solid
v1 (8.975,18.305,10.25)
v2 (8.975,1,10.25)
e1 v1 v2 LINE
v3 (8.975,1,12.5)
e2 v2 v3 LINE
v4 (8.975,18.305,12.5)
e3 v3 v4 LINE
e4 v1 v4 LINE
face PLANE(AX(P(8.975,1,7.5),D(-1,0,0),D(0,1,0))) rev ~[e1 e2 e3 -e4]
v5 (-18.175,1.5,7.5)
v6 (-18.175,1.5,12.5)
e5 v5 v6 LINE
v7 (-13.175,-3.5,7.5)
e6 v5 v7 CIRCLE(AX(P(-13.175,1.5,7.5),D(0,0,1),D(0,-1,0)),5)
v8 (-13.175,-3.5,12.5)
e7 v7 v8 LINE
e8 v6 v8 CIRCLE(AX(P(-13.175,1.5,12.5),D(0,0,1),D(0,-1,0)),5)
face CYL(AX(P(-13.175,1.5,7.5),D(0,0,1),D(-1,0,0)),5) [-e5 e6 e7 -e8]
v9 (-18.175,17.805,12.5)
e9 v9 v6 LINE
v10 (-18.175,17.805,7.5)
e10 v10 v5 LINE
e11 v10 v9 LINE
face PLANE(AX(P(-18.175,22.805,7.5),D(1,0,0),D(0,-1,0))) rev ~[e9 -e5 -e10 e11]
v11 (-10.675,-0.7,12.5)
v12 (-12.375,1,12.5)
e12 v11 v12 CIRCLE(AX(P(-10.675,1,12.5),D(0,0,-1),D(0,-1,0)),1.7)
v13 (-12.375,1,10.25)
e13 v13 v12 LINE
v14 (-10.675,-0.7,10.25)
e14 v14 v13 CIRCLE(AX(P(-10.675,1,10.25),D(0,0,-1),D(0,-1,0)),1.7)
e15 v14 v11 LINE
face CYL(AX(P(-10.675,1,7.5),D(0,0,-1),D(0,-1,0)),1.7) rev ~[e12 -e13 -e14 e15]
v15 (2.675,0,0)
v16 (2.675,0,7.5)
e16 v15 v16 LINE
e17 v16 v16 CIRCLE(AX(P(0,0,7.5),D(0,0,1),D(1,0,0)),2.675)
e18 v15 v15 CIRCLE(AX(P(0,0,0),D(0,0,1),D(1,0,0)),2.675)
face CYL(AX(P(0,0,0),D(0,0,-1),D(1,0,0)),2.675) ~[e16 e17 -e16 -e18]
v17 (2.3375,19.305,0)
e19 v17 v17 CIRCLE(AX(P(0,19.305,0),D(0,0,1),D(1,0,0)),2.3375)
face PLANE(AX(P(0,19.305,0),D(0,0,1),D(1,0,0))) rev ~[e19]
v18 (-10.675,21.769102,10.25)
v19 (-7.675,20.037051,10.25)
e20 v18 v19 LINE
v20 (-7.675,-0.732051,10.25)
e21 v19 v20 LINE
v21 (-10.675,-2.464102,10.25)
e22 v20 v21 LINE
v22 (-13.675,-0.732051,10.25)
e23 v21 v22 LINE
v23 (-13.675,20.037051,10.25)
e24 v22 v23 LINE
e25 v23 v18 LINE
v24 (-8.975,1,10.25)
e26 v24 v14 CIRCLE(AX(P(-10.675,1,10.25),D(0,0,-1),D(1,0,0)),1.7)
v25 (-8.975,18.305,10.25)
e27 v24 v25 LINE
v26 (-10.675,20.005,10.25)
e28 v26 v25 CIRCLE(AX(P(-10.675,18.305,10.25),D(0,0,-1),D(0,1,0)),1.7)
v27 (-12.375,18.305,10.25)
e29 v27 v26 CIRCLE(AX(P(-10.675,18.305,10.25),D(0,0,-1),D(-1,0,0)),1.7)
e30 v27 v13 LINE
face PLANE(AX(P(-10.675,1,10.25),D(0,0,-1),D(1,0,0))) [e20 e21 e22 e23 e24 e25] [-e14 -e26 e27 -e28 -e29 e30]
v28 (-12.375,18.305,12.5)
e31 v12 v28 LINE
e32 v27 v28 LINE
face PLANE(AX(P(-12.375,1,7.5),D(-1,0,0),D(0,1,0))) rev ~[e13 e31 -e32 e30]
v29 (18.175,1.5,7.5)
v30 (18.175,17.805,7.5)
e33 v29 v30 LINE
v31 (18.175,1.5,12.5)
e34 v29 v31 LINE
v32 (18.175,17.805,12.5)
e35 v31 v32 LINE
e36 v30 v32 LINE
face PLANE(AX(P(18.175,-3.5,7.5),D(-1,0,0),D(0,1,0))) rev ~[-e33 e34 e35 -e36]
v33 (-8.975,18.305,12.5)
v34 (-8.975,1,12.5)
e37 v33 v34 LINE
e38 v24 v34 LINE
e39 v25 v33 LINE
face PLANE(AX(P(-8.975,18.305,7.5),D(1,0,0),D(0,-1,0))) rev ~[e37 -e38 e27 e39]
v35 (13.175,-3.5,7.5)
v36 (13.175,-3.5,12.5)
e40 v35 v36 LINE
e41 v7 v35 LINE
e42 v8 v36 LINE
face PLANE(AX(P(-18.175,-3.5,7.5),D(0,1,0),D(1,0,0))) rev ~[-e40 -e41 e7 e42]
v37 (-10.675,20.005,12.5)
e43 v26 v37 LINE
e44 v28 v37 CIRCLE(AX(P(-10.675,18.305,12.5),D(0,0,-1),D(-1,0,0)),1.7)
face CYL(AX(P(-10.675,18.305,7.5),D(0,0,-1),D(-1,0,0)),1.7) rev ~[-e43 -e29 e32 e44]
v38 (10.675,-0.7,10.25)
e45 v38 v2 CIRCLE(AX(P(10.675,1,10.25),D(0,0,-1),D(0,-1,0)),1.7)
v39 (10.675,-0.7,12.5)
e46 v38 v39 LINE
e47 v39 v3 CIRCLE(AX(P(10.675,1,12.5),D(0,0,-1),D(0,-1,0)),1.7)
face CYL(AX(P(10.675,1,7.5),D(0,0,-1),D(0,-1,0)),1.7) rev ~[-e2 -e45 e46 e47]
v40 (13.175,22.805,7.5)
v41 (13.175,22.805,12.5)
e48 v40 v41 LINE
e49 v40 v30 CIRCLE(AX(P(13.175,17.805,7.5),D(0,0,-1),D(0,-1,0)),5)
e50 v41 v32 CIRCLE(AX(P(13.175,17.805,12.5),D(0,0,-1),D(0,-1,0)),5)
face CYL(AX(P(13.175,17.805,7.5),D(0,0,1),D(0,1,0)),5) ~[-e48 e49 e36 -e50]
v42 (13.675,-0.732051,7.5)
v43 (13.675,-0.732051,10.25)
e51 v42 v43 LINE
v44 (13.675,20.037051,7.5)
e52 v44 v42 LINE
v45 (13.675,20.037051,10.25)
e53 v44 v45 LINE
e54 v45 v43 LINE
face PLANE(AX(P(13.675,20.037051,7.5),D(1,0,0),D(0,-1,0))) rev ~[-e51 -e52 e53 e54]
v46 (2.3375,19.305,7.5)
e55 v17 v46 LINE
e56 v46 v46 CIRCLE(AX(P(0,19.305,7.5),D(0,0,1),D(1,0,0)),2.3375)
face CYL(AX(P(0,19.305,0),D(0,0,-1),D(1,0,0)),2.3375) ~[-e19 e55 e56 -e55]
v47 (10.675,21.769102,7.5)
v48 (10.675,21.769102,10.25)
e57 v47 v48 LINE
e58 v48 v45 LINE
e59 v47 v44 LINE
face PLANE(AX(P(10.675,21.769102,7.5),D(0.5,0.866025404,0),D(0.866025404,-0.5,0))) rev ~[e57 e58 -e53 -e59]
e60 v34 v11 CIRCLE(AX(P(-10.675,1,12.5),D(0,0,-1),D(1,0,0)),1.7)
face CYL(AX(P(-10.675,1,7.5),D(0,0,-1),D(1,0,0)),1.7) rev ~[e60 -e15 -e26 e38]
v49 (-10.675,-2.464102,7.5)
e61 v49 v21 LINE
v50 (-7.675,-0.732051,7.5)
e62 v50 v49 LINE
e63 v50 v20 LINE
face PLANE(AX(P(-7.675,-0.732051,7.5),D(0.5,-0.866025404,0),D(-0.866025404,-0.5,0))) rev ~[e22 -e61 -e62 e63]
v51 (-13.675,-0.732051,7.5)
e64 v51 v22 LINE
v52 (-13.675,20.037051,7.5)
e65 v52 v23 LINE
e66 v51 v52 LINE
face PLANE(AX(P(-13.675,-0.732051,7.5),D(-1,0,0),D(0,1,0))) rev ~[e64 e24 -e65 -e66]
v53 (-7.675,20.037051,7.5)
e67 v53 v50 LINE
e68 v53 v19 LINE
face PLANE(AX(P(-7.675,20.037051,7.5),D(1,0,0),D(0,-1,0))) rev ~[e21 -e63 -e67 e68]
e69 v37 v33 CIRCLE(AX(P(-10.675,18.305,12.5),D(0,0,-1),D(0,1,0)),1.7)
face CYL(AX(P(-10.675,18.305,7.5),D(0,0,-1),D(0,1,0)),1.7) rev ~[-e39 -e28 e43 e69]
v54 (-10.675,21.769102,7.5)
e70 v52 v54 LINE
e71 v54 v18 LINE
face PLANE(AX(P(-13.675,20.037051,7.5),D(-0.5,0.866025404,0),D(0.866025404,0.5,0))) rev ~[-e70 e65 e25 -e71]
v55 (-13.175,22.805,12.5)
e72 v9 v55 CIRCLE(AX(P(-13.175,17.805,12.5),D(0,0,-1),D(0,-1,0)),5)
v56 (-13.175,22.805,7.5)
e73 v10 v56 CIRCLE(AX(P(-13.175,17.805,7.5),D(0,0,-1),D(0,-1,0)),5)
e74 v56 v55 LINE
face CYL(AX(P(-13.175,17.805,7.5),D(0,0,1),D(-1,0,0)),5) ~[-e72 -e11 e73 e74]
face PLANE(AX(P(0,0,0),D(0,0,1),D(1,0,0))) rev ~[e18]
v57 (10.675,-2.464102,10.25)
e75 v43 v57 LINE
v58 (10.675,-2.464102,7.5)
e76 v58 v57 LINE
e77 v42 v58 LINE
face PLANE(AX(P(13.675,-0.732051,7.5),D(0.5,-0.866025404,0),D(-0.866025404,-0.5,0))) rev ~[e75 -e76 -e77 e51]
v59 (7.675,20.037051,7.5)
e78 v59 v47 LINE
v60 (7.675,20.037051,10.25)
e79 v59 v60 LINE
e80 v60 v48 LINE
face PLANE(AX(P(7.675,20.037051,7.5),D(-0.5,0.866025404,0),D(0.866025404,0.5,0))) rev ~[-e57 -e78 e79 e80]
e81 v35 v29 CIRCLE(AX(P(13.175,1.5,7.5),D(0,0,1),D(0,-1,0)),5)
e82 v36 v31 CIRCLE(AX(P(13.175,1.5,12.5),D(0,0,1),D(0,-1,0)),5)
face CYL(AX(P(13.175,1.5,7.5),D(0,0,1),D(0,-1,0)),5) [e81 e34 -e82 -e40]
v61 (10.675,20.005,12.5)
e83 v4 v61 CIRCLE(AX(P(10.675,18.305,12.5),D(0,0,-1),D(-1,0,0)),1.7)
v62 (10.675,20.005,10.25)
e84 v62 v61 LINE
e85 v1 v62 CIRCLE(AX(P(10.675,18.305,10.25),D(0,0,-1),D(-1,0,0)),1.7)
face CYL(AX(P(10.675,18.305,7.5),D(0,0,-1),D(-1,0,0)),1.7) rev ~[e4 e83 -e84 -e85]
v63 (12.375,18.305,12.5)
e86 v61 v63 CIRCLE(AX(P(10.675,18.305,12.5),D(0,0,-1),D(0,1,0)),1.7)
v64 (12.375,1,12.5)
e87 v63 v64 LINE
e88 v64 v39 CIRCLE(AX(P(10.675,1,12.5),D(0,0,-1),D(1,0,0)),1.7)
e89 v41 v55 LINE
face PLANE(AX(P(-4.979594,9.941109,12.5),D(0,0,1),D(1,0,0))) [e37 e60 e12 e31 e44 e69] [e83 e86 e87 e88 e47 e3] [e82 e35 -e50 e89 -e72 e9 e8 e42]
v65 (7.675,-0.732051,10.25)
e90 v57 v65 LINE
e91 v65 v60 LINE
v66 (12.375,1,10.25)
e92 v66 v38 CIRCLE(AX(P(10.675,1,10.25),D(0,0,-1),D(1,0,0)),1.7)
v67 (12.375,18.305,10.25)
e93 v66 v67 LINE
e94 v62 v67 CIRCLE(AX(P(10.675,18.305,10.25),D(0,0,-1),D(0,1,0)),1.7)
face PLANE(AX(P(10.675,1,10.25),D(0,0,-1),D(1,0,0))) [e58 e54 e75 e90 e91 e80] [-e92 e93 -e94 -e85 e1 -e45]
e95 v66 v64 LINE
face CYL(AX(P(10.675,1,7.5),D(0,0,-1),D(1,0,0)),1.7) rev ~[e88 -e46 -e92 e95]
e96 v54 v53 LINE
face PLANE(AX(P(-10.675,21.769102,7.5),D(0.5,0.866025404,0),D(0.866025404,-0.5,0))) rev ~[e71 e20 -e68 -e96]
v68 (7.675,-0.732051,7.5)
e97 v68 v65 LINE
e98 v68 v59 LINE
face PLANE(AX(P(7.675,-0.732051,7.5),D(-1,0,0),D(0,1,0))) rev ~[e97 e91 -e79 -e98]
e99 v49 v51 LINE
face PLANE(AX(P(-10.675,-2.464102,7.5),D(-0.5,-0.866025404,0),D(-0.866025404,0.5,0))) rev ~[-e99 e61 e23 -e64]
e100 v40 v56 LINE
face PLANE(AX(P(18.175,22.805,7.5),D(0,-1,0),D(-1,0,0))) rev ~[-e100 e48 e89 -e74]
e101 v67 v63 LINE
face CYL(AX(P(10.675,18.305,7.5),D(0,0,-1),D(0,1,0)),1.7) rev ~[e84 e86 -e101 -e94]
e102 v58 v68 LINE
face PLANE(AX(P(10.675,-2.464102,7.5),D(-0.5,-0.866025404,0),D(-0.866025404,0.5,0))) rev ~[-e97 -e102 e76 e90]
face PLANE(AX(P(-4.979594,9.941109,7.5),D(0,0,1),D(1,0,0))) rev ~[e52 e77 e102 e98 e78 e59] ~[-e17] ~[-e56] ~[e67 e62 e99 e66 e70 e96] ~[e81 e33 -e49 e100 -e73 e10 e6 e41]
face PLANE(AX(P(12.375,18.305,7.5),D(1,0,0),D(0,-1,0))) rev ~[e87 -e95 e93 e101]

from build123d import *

# Parameters (mm, degrees)
F1_R     = 2.3375
F2_DEPTH = 7.5
F1_R_2   = 2.675
F4_DEPTH = 5
F5_R     = 5
F7_DEPTH = 2.75


# Not quite as in the source:
# - a feature names something its author has since deleted; it is built from what else it names


with BuildPart() as f2:
    # F1 (on Top) → F2 (new body)
    with BuildSketch(Plane.XY):
        with Locations((0, 19.305)):
            Circle(F1_R)
    extrude(amount=F2_DEPTH)



with BuildPart() as f2b:
    # F1 (on Top) → F2, piece 2 (new body)
    with BuildSketch(Plane.XY):
        Circle(F1_R_2)
    extrude(amount=F2_DEPTH)


with BuildPart() as f2_1:
    add(f2.part)

    add(f2b.part)  # F4 merges F2b
    # F3 (on face) → F4 (join)
    with BuildSketch(Plane.XY.offset(7.5)):
        with BuildLine():
            Line((0, 21.6425), (0, 22.805))
            Line((0, 22.805), (-10.675, 22.805))
            Line((-10.675, 22.805), (-10.675, 20.005))
            ThreePointArc((-10.675, 20.005), (-9.472918472, 19.507081528), (-8.975, 18.305))
            Line((-8.975, 18.305), (-8.975, 1))
            ThreePointArc((-8.975, 1), (-9.472918472, -0.202081528), (-10.675, -0.7))
            Line((-10.675, -0.7), (-10.675, -3.5))
            Line((-10.675, -3.5), (0, -3.5))
            Line((0, -3.5), (0, 16.9675))
            ThreePointArc((0, 16.9675), (-2.3375, 19.305), (0, 21.6425))
        make_face()
        with BuildLine():
            Line((10.675, 22.805), (0, 22.805))
            Line((0, 22.805), (0, 21.6425))
            ThreePointArc((0, 21.6425), (1.652862101, 20.957862101), (2.3375, 19.305))
            ThreePointArc((2.3375, 19.305), (1.652862101, 17.652137899), (0, 16.9675))
            Line((0, 16.9675), (0, -3.5))
            Line((0, -3.5), (10.675, -3.5))
            Line((10.675, -3.5), (10.675, -0.7))
            ThreePointArc((10.675, -0.7), (9.472918472, -0.202081528), (8.975, 1))
            Line((8.975, 1), (8.975, 18.305))
            ThreePointArc((8.975, 18.305), (9.472918472, 19.507081528), (10.675, 20.005))
            Line((10.675, 20.005), (10.675, 22.805))
        make_face()
        with BuildLine():
            Line((0, 16.9675), (0, 21.6425))
            ThreePointArc((0, 21.6425), (-2.3375, 19.305), (0, 16.9675))
        make_face()
        with BuildLine():
            ThreePointArc((2.3375, 19.305), (1.652862101, 20.957862101), (0, 21.6425))
            Line((0, 21.6425), (0, 16.9675))
            ThreePointArc((0, 16.9675), (1.652862101, 17.652137899), (2.3375, 19.305))
        make_face()
        with BuildLine():
            Line((-10.675, 20.005), (-10.675, 22.805))
            Line((-10.675, 22.805), (-18.175, 22.805))
            Line((-18.175, 22.805), (-18.175, -3.5))
            Line((-18.175, -3.5), (-10.675, -3.5))
            Line((-10.675, -3.5), (-10.675, -0.7))
            ThreePointArc((-10.675, -0.7), (-11.877081528, -0.202081528), (-12.375, 1))
            Line((-12.375, 1), (-12.375, 18.305))
            ThreePointArc((-12.375, 18.305), (-11.877081528, 19.507081528), (-10.675, 20.005))
        make_face()
        with BuildLine():
            Line((18.175, 22.805), (10.675, 22.805))
            Line((10.675, 22.805), (10.675, 20.005))
            ThreePointArc((10.675, 20.005), (11.877081528, 19.507081528), (12.375, 18.305))
            Line((12.375, 18.305), (12.375, 1))
            ThreePointArc((12.375, 1), (11.877081528, -0.202081528), (10.675, -0.7))
            Line((10.675, -0.7), (10.675, -3.5))
            Line((10.675, -3.5), (18.175, -3.5))
            Line((18.175, -3.5), (18.175, 22.805))
        make_face()
    extrude(amount=F4_DEPTH)

    # F5
    f5_edges = [f2_1.edges().sort_by_distance(p)[0] for p in [
        (-18.175, 22.805, 10),
        (-18.175, -3.5, 10),
        (18.175, -3.5, 10),
        (18.175, 22.805, 10),
    ]]
    fillet(f5_edges, radius=F5_R)

    # F6 (on face) → F7 (cut)
    with BuildSketch(Plane(origin=(0, 0, 7.5), x_dir=(1, 0, 0), z_dir=(0, 0, -1))):
        Polygon((-7.675, 0.7320508076), (-10.675, 2.4641016151), (-13.675, 0.7320508076), (-13.675, -2.7320508076), (-10.675, -4.4641016151), (-7.675, -2.7320508076), align=None)
        Polygon((-7.675, -16.5729491924), (-7.675, -2.7320508076), (-10.675, -4.4641016151), (-13.675, -2.7320508076), (-13.675, -16.5729491924), (-10.675, -14.8408983849), align=None)
        Polygon((-7.675, -20.0370508076), (-7.675, -16.5729491924), (-10.675, -14.8408983849), (-13.675, -16.5729491924), (-13.675, -20.0370508076), (-10.675, -21.7691016151), align=None)
        Polygon((10.675, 2.4641016151), (7.675, 0.7320508076), (7.675, -2.7320508076), (10.675, -4.4641016151), (13.675, -2.7320508076), (13.675, 0.7320508076), align=None)
        Polygon((10.675, -4.4641016151), (7.675, -2.7320508076), (7.675, -16.5729491924), (10.675, -14.8408983849), (13.675, -16.5729491924), (13.675, -2.7320508076), align=None)
        Polygon((10.675, -14.8408983849), (7.675, -16.5729491924), (7.675, -20.0370508076), (10.675, -21.7691016151), (13.675, -20.0370508076), (13.675, -16.5729491924), align=None)
    extrude(amount=-F7_DEPTH, mode=Mode.SUBTRACT)


solid = f2_1.part
